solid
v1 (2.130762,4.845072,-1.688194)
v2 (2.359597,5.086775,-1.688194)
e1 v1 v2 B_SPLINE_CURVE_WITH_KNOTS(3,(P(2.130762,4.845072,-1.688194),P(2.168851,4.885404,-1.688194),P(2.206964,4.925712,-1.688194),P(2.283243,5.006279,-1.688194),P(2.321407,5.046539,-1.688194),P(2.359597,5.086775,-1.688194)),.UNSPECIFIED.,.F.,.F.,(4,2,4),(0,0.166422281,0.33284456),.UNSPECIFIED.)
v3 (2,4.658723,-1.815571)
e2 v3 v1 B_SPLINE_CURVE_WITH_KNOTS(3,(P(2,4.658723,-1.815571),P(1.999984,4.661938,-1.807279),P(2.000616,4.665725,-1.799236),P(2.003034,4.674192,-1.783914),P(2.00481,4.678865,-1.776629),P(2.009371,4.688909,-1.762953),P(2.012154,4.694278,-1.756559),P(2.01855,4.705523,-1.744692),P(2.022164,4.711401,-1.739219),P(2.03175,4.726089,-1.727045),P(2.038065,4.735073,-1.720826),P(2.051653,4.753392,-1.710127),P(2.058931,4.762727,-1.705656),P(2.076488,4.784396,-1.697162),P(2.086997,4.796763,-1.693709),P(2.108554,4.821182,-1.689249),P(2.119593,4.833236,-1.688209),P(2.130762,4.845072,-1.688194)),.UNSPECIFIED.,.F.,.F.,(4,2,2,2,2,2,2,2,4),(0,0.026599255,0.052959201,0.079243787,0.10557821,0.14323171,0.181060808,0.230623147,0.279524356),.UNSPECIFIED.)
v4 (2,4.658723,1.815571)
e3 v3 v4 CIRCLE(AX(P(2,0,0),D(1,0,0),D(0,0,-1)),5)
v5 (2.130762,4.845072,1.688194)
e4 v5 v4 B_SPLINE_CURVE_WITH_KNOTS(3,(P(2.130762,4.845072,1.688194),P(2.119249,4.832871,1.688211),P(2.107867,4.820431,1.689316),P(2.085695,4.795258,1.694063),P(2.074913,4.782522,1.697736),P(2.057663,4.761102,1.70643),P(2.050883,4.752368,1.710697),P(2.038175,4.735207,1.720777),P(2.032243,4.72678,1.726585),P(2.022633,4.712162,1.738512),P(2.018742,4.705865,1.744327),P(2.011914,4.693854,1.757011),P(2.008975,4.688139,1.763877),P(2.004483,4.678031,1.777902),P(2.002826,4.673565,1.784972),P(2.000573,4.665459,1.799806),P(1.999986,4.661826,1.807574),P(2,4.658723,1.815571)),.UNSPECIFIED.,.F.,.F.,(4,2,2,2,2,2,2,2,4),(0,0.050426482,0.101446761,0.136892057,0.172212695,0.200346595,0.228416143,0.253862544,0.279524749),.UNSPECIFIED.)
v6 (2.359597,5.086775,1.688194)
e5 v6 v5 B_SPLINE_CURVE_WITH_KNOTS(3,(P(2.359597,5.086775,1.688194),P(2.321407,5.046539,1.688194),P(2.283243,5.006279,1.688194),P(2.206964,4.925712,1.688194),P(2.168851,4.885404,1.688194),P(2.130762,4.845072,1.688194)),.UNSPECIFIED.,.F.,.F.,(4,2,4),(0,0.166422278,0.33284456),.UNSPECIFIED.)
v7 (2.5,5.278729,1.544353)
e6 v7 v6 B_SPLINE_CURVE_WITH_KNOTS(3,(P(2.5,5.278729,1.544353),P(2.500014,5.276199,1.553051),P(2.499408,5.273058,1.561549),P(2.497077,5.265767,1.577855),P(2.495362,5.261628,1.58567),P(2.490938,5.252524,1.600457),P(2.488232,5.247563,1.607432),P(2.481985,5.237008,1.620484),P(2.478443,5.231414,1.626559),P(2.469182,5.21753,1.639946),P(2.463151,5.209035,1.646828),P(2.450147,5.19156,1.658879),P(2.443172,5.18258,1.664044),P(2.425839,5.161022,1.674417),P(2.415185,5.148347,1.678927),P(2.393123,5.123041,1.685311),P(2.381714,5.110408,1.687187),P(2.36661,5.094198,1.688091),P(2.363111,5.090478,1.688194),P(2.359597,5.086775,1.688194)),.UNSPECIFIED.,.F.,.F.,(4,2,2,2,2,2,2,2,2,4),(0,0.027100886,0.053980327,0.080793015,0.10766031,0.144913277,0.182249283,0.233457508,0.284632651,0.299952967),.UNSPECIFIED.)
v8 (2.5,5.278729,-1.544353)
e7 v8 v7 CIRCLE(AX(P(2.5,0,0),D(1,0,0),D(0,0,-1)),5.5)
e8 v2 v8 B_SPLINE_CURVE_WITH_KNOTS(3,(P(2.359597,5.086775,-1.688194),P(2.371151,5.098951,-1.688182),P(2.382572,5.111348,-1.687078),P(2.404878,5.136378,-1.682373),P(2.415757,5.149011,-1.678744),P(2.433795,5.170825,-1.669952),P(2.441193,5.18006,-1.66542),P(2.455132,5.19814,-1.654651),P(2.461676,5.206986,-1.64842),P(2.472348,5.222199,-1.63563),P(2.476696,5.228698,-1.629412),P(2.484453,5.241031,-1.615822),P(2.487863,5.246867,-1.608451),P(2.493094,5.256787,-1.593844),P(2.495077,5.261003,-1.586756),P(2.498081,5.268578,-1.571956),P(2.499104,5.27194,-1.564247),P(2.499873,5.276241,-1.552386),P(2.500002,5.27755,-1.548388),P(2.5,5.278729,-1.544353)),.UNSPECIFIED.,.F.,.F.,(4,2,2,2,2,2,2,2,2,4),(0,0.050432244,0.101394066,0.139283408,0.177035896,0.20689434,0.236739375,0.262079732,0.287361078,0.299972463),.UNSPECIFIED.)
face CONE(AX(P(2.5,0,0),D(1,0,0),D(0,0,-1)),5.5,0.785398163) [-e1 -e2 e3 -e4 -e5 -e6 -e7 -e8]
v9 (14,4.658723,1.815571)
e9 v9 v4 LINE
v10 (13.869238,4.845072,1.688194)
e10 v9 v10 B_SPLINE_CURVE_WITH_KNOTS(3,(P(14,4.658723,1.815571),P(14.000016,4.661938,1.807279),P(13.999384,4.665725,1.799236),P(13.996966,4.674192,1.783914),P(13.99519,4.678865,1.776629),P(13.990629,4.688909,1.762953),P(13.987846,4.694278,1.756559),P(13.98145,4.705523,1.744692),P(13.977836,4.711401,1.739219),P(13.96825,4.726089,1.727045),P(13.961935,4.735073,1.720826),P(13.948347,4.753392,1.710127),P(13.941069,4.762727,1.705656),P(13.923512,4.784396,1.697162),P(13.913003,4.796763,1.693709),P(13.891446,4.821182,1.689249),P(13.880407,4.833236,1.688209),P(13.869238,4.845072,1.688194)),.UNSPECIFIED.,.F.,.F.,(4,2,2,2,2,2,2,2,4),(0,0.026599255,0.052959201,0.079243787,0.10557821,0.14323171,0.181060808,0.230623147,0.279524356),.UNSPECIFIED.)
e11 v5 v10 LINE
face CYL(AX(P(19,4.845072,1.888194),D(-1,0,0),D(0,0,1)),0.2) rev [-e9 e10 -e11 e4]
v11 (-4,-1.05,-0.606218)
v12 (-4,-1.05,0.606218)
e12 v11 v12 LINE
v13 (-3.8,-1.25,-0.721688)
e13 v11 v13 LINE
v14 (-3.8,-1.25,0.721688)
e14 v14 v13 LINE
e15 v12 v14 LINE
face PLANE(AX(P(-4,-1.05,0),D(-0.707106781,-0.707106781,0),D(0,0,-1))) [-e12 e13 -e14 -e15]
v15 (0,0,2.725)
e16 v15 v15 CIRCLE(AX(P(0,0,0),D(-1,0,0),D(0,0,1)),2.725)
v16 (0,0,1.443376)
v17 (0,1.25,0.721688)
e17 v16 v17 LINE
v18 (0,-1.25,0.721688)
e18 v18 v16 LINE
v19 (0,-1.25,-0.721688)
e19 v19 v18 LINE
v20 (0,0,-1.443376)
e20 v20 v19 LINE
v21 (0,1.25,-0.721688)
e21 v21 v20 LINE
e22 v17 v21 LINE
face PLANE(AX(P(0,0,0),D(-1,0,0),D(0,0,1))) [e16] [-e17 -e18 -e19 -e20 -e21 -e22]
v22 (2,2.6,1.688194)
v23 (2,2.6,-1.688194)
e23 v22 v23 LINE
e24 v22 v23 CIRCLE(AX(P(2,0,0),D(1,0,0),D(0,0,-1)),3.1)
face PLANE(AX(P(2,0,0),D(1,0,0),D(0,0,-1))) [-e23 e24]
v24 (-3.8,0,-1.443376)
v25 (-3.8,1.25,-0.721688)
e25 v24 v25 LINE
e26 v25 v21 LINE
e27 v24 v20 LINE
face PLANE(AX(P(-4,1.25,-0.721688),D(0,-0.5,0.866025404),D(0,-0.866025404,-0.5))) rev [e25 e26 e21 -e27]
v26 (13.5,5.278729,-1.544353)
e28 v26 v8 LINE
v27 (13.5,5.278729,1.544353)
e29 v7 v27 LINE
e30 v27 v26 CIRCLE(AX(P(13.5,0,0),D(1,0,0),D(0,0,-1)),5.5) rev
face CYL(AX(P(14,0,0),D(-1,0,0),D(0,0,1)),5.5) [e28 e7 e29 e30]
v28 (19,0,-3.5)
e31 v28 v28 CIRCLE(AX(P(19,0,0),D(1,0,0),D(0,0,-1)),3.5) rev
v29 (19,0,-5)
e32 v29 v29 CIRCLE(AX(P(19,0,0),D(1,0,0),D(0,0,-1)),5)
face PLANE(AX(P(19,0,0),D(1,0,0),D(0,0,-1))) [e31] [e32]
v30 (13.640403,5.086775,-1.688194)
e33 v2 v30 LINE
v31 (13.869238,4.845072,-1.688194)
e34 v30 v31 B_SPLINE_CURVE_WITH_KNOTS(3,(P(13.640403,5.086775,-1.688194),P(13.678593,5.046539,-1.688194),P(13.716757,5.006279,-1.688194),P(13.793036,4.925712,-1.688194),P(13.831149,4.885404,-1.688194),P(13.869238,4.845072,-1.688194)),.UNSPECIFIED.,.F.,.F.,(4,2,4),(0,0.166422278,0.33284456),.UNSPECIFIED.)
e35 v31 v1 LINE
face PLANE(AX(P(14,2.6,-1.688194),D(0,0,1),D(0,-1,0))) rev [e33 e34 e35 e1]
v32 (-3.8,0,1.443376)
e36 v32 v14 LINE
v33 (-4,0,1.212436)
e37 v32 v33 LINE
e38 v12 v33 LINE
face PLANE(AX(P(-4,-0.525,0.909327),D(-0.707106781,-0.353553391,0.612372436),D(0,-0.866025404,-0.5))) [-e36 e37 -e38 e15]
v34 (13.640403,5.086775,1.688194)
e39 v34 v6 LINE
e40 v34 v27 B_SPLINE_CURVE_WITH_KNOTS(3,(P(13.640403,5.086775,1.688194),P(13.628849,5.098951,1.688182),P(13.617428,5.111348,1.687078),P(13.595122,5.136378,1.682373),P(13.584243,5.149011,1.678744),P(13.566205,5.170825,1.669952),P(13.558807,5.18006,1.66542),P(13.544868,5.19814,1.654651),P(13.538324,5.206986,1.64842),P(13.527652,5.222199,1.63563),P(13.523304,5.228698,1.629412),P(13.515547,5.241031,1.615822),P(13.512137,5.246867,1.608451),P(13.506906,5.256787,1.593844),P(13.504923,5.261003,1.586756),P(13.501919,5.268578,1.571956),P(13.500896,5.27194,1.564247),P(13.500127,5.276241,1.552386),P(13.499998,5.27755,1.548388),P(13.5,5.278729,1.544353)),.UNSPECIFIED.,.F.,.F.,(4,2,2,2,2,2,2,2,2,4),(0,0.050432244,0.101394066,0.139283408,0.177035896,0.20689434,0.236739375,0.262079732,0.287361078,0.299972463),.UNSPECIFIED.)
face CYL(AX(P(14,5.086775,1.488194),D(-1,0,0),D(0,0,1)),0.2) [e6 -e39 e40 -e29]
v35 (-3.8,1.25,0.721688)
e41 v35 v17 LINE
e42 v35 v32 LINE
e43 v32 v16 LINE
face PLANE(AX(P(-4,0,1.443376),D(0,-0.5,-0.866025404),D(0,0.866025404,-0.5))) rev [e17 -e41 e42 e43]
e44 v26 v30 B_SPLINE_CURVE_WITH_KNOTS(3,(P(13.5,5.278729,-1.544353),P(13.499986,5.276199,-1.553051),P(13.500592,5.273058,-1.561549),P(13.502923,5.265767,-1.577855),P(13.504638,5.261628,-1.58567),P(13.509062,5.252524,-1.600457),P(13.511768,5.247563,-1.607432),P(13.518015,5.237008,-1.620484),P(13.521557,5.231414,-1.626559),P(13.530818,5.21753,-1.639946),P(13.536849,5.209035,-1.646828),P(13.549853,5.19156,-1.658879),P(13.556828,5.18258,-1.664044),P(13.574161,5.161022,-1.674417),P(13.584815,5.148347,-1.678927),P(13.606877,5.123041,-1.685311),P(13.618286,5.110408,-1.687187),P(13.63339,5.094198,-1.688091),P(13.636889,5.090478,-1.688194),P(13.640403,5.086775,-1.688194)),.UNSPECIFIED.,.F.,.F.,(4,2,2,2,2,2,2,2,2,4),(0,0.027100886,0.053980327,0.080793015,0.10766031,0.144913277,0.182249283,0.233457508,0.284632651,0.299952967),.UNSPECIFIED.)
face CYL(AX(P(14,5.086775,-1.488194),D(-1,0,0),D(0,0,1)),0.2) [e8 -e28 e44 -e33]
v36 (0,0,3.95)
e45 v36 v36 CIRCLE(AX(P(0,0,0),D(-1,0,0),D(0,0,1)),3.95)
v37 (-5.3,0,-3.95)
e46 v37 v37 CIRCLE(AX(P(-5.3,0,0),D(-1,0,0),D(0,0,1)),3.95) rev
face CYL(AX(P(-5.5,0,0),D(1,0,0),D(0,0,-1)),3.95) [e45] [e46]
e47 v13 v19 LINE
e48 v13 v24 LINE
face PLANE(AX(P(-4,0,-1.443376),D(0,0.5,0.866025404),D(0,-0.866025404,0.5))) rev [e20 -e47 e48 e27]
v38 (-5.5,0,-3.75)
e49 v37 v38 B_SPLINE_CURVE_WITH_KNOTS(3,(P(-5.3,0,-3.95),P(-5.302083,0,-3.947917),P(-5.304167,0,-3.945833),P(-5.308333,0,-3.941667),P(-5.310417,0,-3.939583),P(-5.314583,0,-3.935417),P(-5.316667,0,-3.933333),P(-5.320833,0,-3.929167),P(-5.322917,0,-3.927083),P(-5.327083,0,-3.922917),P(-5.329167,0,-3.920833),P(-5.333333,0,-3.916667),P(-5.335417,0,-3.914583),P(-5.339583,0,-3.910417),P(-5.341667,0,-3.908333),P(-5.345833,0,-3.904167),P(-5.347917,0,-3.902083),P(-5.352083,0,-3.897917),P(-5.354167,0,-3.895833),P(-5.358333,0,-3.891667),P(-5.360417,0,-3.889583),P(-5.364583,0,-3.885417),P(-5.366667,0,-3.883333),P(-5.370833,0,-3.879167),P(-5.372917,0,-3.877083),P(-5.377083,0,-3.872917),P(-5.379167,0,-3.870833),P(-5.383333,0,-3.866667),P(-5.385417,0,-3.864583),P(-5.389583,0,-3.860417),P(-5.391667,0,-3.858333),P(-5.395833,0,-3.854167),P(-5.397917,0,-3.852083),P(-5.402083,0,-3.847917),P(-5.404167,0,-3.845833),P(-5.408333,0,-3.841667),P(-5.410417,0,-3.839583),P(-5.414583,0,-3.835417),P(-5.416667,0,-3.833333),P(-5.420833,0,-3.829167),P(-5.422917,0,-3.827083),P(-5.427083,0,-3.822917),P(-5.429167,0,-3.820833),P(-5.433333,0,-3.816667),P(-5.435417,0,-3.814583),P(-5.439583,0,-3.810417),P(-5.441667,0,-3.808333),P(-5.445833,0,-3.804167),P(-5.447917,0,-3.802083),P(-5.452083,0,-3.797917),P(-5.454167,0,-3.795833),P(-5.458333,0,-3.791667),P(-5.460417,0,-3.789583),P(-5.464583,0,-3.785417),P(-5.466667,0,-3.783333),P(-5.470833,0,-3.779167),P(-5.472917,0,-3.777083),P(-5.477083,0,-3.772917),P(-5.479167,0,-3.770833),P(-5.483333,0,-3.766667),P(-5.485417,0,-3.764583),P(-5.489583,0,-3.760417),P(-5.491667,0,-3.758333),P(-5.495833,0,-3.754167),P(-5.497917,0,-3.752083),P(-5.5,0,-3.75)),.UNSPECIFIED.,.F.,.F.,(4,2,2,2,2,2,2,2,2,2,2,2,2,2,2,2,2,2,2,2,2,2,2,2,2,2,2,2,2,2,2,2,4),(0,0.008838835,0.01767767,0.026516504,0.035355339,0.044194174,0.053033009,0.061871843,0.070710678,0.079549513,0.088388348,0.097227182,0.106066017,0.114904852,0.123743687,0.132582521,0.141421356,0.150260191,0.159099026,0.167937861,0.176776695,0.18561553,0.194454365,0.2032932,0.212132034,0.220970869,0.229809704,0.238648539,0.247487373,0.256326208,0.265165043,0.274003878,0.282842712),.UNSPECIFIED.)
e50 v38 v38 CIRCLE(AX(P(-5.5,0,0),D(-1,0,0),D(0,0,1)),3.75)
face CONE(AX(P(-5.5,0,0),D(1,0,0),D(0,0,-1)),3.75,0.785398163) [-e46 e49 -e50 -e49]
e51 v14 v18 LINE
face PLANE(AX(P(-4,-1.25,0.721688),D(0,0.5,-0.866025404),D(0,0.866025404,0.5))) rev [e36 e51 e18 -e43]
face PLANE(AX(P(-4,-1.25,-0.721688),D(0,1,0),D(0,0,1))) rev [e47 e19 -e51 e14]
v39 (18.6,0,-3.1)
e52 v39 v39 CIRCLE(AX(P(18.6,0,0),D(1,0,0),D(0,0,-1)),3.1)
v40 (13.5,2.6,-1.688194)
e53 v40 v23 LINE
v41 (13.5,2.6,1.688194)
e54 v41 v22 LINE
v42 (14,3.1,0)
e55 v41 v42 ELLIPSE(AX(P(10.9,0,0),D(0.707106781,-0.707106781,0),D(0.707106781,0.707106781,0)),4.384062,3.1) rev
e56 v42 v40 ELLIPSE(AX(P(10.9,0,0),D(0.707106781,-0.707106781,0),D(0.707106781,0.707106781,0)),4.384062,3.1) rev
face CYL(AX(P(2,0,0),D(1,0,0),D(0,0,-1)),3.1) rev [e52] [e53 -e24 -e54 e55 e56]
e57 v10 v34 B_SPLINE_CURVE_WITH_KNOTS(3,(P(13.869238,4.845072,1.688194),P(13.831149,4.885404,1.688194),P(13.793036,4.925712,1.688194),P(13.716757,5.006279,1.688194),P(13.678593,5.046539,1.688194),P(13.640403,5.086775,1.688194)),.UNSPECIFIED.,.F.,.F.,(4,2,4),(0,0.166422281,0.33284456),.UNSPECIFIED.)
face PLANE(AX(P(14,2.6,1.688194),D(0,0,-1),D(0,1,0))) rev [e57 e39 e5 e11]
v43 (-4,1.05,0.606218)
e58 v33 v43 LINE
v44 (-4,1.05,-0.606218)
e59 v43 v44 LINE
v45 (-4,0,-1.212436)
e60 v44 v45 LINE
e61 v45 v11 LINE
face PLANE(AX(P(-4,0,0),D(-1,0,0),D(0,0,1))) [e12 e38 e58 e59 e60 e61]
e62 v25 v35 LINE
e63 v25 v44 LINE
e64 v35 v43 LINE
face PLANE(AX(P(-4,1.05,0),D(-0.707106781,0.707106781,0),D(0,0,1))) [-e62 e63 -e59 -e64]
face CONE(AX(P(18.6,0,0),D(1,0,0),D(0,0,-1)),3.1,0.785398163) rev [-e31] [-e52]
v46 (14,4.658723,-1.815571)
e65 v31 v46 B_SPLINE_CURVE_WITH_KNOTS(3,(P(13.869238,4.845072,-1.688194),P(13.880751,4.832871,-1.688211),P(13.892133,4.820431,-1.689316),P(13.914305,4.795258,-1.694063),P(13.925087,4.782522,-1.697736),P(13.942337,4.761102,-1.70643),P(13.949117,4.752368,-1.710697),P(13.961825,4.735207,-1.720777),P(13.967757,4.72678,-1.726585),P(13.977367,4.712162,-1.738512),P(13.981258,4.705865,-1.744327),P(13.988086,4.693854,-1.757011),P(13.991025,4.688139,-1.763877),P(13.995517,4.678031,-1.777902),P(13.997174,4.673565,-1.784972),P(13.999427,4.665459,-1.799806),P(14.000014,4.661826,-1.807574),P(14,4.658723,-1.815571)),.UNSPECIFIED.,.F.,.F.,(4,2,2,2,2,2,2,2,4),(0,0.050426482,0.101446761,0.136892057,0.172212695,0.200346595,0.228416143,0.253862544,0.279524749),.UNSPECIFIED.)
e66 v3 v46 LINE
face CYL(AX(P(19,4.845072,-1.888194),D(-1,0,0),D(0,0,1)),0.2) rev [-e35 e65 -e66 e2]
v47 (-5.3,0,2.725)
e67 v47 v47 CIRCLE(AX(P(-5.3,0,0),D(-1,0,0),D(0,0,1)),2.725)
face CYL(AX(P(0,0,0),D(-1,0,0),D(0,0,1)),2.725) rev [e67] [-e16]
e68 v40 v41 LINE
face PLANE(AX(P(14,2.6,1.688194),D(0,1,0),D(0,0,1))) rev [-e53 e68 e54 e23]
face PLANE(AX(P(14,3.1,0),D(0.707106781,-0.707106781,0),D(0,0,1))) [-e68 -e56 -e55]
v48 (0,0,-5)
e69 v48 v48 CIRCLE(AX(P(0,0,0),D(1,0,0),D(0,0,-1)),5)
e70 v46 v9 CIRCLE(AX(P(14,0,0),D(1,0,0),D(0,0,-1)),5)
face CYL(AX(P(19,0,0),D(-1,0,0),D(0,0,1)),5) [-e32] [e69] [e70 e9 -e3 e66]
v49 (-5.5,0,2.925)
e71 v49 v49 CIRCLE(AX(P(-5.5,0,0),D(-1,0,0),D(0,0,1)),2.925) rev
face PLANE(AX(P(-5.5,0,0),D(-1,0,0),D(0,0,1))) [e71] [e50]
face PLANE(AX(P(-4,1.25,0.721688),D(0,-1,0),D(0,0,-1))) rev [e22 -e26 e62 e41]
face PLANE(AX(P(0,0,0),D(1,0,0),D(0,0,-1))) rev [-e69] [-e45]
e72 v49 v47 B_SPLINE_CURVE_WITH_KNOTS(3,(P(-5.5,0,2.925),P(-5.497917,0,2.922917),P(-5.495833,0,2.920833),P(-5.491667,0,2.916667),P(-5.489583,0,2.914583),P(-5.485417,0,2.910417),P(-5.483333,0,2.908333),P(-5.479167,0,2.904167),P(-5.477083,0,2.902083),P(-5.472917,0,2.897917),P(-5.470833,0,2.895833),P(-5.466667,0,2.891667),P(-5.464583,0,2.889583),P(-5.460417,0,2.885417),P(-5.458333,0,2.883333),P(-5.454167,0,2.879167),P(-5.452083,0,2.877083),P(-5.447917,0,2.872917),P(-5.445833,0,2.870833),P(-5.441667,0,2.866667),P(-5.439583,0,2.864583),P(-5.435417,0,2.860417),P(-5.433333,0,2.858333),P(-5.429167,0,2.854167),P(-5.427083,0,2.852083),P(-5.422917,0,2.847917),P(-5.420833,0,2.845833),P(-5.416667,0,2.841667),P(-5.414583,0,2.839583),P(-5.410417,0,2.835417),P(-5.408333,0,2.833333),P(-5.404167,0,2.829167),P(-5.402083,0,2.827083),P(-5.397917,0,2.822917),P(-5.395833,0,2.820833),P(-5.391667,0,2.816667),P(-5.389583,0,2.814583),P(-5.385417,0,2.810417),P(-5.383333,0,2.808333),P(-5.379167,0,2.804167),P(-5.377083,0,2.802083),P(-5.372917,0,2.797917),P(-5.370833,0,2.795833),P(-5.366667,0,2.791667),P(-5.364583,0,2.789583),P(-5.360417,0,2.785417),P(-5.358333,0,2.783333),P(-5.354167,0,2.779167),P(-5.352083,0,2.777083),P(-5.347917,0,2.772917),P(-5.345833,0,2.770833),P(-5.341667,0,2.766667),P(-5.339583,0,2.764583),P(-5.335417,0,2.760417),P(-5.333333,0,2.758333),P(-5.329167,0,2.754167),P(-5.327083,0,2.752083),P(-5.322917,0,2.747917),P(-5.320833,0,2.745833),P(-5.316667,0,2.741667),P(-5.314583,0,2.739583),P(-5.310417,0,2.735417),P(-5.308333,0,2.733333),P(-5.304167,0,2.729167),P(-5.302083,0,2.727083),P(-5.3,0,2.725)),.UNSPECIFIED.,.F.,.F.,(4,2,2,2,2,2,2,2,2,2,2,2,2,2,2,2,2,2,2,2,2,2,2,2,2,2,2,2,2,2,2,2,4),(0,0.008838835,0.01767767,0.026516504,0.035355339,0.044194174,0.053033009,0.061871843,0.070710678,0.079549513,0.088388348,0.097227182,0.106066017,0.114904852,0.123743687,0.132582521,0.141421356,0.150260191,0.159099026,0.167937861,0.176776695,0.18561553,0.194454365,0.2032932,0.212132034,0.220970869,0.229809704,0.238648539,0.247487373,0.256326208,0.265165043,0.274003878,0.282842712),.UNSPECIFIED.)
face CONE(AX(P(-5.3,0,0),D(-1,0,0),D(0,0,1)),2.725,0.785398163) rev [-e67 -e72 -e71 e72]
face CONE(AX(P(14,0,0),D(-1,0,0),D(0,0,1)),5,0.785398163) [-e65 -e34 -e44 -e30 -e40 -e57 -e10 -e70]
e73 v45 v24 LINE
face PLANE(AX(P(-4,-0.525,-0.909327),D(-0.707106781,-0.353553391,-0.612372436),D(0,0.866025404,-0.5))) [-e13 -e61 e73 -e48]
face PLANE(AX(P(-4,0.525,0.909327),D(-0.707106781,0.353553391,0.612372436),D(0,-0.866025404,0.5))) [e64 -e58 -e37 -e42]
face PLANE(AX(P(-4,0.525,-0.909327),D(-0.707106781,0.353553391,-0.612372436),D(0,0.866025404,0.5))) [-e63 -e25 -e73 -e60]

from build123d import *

# Parameters (mm, degrees)
SKETCH_1_R          = 5
EXTRUDE_1_DEPTH     = 19
SKETCH_3_R          = 3.1
CUT_EXTRUDE_1_DEPTH = 17
EXTRUDE_2_DEPTH     = 12
SKETCH_8_R          = 3.95
EXTRUDE_4_DEPTH     = 5.5
SKETCH_9_R          = 2.725
CUT_EXTRUDE_2_DEPTH = 5.5
EXTRUDE_5_DEPTH     = 4
FILLET_1_R          = 0.2
CHAMFER_1_SIZE      = 0.5
CHAMFER_2_SIZE      = 0.4
CHAMFER_3_SIZE      = 0.2


with BuildPart() as part:
    # 草图1 → 凸台-拉伸1 (new body)
    with BuildSketch(Plane(origin=(0, 0, 0), x_dir=(0, 0, -1), z_dir=(1, 0, 0))):
        Circle(SKETCH_1_R)
    extrude(amount=EXTRUDE_1_DEPTH)

    # 草图3 → 切除-拉伸1 (cut)
    with BuildSketch(Plane(origin=(19, 0, 0), x_dir=(0, 0, -1), z_dir=(1, 0, 0))):
        Circle(SKETCH_3_R)
    extrude(amount=-CUT_EXTRUDE_1_DEPTH, mode=Mode.SUBTRACT)

    # 草图5 → 凸台-拉伸2 (add)
    with BuildSketch(Plane(origin=(2, 0, 0), x_dir=(0, 0, -1), z_dir=(1, 0, 0))):
        with BuildLine():
            Line((-1.688194302, 2.6), (1.688194302, 2.6))
            Line((1.688194302, 2.6), (1.688194302, 5.234500931))
            ThreePointArc((1.688194302, 5.234500931), (0, 5.5), (-1.688194302, 5.234500931))
            Line((-1.688194302, 5.234500931), (-1.688194302, 2.6))
        make_face()
    extrude(amount=EXTRUDE_2_DEPTH)

    # 草图8 → 凸台-拉伸4 (add)
    with BuildSketch(Plane.ZY):
        Circle(SKETCH_8_R)
    extrude(amount=EXTRUDE_4_DEPTH)

    # 草图9 → 切除-拉伸2 (cut)
    with BuildSketch(Plane.ZY.offset(5.5)):
        Circle(SKETCH_9_R)
    extrude(amount=-CUT_EXTRUDE_2_DEPTH, mode=Mode.SUBTRACT)

    # 草图10 → 凸台-拉伸5 (add)
    with BuildSketch(Plane.ZY):
        Polygon((0.721687836, 1.25), (-0.721687836, 1.25), (-1.443375673, 0), (-0.721687836, -1.25), (0.721687836, -1.25), (1.443375673, 0), align=None)
    extrude(amount=EXTRUDE_5_DEPTH)

    # 圆角1
    fillet_1_edges = [part.edges().sort_by_distance(p)[0] for p in [
        (8, 4.70637865, 1.688194302),
        (8, 5.234500931, 1.688194302),
        (8, 4.70637865, -1.688194302),
        (8, 5.234500931, -1.688194302),
    ]]
    fillet(fillet_1_edges, radius=FILLET_1_R)

    # 倒角1
    # the kernel refuses this chamfer: 0.5 mm, written as the material it takes off along each edge
    with BuildSketch(Plane(origin=(14, 0, 0), x_dir=(0, 0.8686030413593419, -0.4955085837211114), z_dir=(0, -0.4955085837211114, -0.8686030413593419))) as chamfer_1_piece_1:
        Polygon((5.5, -CHAMFER_1_SIZE), (5.5 - CHAMFER_1_SIZE, 0), (5.5, 0), align=None)
    revolve(axis=Axis((14, 0, 0), (1, 0, 0)), revolution_arc=59.40658503, mode=Mode.SUBTRACT)
    with BuildSketch(Plane(origin=(2, 0, 0), x_dir=(0, 0.8686030413593415, -0.4955085837211117), z_dir=(0, -0.4955085837211117, -0.8686030413593415))) as chamfer_1_piece_2:
        Polygon((5.5 - CHAMFER_1_SIZE, 0), (5.5, CHAMFER_1_SIZE), (5.5, 0), align=None)
    revolve(axis=Axis((2, 0, 0), (1, 0, 0)), revolution_arc=59.40658503, mode=Mode.SUBTRACT)
    with BuildSketch(Plane(origin=(14, 2.6, 2.974035796), x_dir=(0.027495876610585623, 0.9996219169112968, 0), z_dir=(0, 0, -1))) as chamfer_1_piece_3_section:
        Polygon((CHAMFER_1_SIZE * 0.999621916911, -CHAMFER_1_SIZE * 0.0274958766106), (-CHAMFER_1_SIZE * 0.0274958766106, -CHAMFER_1_SIZE * 0.999621916911), (0, 0), align=None)
    chamfer_1_piece_3 = extrude(amount=5.948071591, mode=Mode.PRIVATE)
    chamfer_1_piece_3 = chamfer_1_piece_3 & Plane(origin=(13.821912141, 0, 0), x_dir=(0, 0, -1), z_dir=(1, 0, 0)) * Cylinder(3.1, 14, mode=Mode.PRIVATE)
    add(chamfer_1_piece_3, mode=Mode.SUBTRACT)

    # 倒角2
    chamfer_2_edges = [part.edges().sort_by_distance(p)[0] for p in [
        (19, 0, 3.1),
    ]]
    chamfer(chamfer_2_edges, length=CHAMFER_2_SIZE)

    # 倒角3
    chamfer_3_edges = [part.edges().sort_by_distance(p)[0] for p in [
        (-5.5, 0, -3.95),
        (-5.5, 0, -2.725),
        (-4, 0.625, 1.082531755),
        (-4, 1.25, 0),
        (-4, 0.625, -1.082531755),
        (-4, -0.625, -1.082531755),
        (-4, -1.25, 0),
        (-4, -0.625, 1.082531755),
    ]]
    chamfer(chamfer_3_edges, length=CHAMFER_3_SIZE)


solid = part.part
